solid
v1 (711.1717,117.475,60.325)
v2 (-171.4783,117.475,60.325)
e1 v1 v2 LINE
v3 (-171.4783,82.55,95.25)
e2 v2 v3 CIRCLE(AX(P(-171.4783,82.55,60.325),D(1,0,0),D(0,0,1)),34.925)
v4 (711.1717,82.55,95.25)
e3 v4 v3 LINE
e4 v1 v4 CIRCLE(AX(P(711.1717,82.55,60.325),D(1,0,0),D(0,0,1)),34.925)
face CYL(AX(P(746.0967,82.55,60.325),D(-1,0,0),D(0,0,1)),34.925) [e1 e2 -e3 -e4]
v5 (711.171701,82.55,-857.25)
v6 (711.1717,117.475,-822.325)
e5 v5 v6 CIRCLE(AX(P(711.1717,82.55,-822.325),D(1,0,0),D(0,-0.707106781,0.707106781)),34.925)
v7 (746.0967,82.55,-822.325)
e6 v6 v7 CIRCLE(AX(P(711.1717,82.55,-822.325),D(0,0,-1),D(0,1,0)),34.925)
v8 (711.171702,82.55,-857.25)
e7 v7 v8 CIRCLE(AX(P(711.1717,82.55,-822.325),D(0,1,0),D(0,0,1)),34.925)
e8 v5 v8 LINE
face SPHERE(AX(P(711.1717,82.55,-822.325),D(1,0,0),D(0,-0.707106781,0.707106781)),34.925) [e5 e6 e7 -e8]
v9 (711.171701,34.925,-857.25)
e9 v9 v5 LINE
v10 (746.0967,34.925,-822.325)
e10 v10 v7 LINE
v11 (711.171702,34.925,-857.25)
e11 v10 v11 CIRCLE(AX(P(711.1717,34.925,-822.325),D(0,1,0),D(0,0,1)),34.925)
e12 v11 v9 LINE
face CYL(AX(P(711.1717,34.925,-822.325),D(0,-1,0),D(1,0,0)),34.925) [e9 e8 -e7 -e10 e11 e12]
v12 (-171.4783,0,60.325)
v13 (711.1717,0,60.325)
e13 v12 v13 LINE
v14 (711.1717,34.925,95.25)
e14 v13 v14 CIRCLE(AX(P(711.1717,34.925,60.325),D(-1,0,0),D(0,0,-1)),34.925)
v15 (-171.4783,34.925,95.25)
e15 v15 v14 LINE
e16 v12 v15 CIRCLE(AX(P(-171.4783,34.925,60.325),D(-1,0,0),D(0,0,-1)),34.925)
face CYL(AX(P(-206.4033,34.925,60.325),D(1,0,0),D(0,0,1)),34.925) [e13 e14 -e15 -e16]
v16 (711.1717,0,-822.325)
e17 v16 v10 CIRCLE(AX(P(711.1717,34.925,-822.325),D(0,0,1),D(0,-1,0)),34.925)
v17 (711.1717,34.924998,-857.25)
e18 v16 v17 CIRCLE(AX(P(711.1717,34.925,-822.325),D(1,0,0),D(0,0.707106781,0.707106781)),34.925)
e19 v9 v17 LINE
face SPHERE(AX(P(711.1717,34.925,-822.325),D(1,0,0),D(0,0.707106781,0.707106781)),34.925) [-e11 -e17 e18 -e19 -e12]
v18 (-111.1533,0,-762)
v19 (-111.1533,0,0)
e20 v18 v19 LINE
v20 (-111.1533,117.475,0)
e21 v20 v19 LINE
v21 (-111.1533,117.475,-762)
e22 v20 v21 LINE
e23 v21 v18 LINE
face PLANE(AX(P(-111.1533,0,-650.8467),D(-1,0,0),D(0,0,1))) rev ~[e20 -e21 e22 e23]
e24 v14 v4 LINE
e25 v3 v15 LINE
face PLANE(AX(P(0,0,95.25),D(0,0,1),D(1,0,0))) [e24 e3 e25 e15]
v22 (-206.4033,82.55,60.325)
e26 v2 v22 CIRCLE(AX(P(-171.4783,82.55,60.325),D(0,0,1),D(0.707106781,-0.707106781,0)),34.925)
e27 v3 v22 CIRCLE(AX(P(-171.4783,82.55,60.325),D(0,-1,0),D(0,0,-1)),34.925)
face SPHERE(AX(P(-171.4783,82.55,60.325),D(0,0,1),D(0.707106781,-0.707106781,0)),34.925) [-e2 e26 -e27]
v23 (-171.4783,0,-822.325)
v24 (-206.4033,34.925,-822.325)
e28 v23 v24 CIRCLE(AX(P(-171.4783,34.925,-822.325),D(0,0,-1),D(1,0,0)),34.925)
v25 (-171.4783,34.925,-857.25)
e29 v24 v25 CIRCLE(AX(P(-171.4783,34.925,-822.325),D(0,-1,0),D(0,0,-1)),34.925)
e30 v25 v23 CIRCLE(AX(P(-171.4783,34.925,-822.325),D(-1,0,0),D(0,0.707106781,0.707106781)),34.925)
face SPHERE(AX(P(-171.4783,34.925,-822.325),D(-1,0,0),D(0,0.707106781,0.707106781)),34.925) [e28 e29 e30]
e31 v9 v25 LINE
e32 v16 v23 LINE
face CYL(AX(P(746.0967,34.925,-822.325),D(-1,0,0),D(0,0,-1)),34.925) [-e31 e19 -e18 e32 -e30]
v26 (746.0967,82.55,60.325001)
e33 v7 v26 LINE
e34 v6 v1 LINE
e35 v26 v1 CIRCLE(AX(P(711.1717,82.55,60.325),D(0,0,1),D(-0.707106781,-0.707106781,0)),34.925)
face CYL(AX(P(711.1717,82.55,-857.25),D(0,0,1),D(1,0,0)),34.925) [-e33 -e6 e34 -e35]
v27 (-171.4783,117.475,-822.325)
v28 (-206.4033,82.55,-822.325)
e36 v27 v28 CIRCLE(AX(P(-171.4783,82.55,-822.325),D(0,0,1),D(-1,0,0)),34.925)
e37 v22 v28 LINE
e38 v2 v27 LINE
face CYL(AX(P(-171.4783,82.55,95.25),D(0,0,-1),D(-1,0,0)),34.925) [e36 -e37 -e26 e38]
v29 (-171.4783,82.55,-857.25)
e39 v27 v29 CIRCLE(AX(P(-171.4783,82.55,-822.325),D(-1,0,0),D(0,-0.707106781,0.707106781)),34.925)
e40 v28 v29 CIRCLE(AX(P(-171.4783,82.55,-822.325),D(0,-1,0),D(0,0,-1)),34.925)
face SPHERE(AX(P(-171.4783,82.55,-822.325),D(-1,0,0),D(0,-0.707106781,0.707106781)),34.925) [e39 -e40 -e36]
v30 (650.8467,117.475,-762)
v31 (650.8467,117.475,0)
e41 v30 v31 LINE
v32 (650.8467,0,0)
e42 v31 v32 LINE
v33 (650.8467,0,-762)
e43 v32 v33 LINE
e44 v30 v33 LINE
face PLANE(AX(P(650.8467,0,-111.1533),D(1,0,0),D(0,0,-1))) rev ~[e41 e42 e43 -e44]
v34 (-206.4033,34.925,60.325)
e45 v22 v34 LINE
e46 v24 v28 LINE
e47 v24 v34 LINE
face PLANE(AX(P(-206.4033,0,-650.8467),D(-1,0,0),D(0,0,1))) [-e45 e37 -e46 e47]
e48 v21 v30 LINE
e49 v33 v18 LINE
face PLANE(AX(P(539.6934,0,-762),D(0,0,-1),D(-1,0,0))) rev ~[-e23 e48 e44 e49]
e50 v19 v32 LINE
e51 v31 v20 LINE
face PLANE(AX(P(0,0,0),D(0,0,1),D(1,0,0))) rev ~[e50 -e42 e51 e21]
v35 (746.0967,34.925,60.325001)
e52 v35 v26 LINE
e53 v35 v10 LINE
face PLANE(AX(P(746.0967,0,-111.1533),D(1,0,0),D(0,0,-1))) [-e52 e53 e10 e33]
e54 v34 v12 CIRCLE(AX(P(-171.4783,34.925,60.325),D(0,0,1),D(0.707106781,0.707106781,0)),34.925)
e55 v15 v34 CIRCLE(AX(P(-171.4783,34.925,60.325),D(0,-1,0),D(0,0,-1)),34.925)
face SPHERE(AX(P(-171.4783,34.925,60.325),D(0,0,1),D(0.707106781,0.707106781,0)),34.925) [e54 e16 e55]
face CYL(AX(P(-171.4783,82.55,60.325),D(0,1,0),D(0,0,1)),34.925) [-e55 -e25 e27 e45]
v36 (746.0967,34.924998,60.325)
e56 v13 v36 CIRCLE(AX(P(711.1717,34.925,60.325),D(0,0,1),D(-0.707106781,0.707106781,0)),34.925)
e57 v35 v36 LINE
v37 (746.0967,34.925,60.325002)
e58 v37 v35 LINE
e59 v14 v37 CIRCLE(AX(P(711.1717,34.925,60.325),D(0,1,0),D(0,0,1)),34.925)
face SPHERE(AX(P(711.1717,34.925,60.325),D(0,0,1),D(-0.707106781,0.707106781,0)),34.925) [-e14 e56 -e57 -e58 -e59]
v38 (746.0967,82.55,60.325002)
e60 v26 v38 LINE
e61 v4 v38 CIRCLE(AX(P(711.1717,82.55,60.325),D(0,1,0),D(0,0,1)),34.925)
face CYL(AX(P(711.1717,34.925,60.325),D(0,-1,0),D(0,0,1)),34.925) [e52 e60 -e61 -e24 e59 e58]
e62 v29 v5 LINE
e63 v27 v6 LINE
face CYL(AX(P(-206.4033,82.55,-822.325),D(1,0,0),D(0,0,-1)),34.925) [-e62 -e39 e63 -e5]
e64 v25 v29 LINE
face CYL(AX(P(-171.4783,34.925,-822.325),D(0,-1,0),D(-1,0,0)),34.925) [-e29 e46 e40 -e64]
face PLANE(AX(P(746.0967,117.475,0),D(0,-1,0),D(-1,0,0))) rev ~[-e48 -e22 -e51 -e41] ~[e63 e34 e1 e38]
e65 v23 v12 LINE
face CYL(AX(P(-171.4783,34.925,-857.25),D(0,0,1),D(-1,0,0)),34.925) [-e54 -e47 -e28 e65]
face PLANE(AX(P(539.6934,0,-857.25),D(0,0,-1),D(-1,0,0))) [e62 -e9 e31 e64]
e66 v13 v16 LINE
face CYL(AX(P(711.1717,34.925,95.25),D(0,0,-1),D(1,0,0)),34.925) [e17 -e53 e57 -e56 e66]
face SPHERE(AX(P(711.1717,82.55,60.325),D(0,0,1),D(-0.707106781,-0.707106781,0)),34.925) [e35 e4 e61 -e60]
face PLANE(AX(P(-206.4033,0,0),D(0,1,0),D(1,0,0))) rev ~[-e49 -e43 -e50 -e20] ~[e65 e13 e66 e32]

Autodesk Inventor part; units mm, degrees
ref_plane "YZ Plane" through (0, 0, 0) normal (1, 0, 0) x (0, 1, 0)
ref_plane "XZ Plane" through (0, 0, 0) normal (0, 1, 0) x (-1, 0, 0)
ref_plane "XY Plane" through (0, 0, 0) normal (0, 0, 1) x (1, 0, 0)
sketch "Sketch1" plane through (0, 0, 0) normal (0, 0, 1) x (1, 0, 0)
  line L0 (-206.4033, 0) -> (746.0967, 0)
  line L1 (746.0967, 0) -> (746.0967, 117.475)
  line L2 (746.0967, 117.475) -> (-206.4033, 117.475)
  line L3 (-206.4033, 117.475) -> (-206.4033, 0)
  point P0 (0, 0)
  dimension "d0" = 952.5
  dimension "d1" = 117.475
extrude "Extrusion1" add sketch "Sketch1" along normal blind 95.25
sketch "Sketch3" plane through (-206.4033, 117.475, 0) normal (0, 1, 0) x (1, 0, 0)
  line L0 (952.5, 0) -> (0, 0) projected
  line L1 (0, 0) -> (95.25, 0)
  line L2 (952.5, -95.25) -> (0, -95.25) projected
  line L3 (95.25, 0) -> (0, -95.25)
  line L4 (952.5, 0) -> (857.25, 0)
  line L5 (857.25, 0) -> (952.5, -95.25)
  line L6 (0, -95.25) -> (0, 0)
  line L7 (0, 0) -> (95.25, 0)
  line L8 (857.25, 0) -> (952.5, 0)
  line L9 (952.5, 0) -> (952.5, -95.25)
  line L10 (95.25, 0) -> (857.25, 0)
  point P0 (206.4033, 0)
  dimension "d6" = 95.25
  dimension "d7" = 95.25
extrude "Extrusion2" cut sketch "Sketch3" against normal through all contours L9 L5 L0 | L3 L6 L0
fillet "Fillet1" radius 34.925 2 edges at (269.8467, 0, 95.25) (269.8467, 117.475, 95.25)
shell "Shell1" [suppressed]
sketch "Sketch4" plane through (-111.1533, 117.475, 0) normal (0, 1, 0) x (1, 0, 0)
  line L0 (762, 0) -> (0, 0) projected
  line L1 (381, 0) -> (381, 381)
  point P0 (111.1533, 0)
ref_plane "Work Plane1" through (269.8467, 107.475, -381) normal (0, 0, -1) x (0, 1, 0)
pattern_circular "Circular Pattern1" count 4 over 360 about axis through (269.8467, 107.475, -381) along (0, 1, 0)
fillet "Fillet3" radius 34.925 12 edges at (-196.174, 107.2457, -847.0207) (-196.174, 10.2293, -847.0207) (-206.4033, 58.7375, -857.25) (746.0967, 58.7375, -857.25) (735.8674, 10.2293, -847.0207) (735.8674, 107.2457, -847.0207) (735.8674, 107.2457, 85.0207) (735.8674, 10.2293, 85.0207) (746.0967, 58.7375, 95.25) (-196.174, 10.2293, 85.0207) (-196.174, 107.2457, 85.0207) (-206.4033, 58.7375, 95.25)
properties part number "2025 Bumper Fabric"
